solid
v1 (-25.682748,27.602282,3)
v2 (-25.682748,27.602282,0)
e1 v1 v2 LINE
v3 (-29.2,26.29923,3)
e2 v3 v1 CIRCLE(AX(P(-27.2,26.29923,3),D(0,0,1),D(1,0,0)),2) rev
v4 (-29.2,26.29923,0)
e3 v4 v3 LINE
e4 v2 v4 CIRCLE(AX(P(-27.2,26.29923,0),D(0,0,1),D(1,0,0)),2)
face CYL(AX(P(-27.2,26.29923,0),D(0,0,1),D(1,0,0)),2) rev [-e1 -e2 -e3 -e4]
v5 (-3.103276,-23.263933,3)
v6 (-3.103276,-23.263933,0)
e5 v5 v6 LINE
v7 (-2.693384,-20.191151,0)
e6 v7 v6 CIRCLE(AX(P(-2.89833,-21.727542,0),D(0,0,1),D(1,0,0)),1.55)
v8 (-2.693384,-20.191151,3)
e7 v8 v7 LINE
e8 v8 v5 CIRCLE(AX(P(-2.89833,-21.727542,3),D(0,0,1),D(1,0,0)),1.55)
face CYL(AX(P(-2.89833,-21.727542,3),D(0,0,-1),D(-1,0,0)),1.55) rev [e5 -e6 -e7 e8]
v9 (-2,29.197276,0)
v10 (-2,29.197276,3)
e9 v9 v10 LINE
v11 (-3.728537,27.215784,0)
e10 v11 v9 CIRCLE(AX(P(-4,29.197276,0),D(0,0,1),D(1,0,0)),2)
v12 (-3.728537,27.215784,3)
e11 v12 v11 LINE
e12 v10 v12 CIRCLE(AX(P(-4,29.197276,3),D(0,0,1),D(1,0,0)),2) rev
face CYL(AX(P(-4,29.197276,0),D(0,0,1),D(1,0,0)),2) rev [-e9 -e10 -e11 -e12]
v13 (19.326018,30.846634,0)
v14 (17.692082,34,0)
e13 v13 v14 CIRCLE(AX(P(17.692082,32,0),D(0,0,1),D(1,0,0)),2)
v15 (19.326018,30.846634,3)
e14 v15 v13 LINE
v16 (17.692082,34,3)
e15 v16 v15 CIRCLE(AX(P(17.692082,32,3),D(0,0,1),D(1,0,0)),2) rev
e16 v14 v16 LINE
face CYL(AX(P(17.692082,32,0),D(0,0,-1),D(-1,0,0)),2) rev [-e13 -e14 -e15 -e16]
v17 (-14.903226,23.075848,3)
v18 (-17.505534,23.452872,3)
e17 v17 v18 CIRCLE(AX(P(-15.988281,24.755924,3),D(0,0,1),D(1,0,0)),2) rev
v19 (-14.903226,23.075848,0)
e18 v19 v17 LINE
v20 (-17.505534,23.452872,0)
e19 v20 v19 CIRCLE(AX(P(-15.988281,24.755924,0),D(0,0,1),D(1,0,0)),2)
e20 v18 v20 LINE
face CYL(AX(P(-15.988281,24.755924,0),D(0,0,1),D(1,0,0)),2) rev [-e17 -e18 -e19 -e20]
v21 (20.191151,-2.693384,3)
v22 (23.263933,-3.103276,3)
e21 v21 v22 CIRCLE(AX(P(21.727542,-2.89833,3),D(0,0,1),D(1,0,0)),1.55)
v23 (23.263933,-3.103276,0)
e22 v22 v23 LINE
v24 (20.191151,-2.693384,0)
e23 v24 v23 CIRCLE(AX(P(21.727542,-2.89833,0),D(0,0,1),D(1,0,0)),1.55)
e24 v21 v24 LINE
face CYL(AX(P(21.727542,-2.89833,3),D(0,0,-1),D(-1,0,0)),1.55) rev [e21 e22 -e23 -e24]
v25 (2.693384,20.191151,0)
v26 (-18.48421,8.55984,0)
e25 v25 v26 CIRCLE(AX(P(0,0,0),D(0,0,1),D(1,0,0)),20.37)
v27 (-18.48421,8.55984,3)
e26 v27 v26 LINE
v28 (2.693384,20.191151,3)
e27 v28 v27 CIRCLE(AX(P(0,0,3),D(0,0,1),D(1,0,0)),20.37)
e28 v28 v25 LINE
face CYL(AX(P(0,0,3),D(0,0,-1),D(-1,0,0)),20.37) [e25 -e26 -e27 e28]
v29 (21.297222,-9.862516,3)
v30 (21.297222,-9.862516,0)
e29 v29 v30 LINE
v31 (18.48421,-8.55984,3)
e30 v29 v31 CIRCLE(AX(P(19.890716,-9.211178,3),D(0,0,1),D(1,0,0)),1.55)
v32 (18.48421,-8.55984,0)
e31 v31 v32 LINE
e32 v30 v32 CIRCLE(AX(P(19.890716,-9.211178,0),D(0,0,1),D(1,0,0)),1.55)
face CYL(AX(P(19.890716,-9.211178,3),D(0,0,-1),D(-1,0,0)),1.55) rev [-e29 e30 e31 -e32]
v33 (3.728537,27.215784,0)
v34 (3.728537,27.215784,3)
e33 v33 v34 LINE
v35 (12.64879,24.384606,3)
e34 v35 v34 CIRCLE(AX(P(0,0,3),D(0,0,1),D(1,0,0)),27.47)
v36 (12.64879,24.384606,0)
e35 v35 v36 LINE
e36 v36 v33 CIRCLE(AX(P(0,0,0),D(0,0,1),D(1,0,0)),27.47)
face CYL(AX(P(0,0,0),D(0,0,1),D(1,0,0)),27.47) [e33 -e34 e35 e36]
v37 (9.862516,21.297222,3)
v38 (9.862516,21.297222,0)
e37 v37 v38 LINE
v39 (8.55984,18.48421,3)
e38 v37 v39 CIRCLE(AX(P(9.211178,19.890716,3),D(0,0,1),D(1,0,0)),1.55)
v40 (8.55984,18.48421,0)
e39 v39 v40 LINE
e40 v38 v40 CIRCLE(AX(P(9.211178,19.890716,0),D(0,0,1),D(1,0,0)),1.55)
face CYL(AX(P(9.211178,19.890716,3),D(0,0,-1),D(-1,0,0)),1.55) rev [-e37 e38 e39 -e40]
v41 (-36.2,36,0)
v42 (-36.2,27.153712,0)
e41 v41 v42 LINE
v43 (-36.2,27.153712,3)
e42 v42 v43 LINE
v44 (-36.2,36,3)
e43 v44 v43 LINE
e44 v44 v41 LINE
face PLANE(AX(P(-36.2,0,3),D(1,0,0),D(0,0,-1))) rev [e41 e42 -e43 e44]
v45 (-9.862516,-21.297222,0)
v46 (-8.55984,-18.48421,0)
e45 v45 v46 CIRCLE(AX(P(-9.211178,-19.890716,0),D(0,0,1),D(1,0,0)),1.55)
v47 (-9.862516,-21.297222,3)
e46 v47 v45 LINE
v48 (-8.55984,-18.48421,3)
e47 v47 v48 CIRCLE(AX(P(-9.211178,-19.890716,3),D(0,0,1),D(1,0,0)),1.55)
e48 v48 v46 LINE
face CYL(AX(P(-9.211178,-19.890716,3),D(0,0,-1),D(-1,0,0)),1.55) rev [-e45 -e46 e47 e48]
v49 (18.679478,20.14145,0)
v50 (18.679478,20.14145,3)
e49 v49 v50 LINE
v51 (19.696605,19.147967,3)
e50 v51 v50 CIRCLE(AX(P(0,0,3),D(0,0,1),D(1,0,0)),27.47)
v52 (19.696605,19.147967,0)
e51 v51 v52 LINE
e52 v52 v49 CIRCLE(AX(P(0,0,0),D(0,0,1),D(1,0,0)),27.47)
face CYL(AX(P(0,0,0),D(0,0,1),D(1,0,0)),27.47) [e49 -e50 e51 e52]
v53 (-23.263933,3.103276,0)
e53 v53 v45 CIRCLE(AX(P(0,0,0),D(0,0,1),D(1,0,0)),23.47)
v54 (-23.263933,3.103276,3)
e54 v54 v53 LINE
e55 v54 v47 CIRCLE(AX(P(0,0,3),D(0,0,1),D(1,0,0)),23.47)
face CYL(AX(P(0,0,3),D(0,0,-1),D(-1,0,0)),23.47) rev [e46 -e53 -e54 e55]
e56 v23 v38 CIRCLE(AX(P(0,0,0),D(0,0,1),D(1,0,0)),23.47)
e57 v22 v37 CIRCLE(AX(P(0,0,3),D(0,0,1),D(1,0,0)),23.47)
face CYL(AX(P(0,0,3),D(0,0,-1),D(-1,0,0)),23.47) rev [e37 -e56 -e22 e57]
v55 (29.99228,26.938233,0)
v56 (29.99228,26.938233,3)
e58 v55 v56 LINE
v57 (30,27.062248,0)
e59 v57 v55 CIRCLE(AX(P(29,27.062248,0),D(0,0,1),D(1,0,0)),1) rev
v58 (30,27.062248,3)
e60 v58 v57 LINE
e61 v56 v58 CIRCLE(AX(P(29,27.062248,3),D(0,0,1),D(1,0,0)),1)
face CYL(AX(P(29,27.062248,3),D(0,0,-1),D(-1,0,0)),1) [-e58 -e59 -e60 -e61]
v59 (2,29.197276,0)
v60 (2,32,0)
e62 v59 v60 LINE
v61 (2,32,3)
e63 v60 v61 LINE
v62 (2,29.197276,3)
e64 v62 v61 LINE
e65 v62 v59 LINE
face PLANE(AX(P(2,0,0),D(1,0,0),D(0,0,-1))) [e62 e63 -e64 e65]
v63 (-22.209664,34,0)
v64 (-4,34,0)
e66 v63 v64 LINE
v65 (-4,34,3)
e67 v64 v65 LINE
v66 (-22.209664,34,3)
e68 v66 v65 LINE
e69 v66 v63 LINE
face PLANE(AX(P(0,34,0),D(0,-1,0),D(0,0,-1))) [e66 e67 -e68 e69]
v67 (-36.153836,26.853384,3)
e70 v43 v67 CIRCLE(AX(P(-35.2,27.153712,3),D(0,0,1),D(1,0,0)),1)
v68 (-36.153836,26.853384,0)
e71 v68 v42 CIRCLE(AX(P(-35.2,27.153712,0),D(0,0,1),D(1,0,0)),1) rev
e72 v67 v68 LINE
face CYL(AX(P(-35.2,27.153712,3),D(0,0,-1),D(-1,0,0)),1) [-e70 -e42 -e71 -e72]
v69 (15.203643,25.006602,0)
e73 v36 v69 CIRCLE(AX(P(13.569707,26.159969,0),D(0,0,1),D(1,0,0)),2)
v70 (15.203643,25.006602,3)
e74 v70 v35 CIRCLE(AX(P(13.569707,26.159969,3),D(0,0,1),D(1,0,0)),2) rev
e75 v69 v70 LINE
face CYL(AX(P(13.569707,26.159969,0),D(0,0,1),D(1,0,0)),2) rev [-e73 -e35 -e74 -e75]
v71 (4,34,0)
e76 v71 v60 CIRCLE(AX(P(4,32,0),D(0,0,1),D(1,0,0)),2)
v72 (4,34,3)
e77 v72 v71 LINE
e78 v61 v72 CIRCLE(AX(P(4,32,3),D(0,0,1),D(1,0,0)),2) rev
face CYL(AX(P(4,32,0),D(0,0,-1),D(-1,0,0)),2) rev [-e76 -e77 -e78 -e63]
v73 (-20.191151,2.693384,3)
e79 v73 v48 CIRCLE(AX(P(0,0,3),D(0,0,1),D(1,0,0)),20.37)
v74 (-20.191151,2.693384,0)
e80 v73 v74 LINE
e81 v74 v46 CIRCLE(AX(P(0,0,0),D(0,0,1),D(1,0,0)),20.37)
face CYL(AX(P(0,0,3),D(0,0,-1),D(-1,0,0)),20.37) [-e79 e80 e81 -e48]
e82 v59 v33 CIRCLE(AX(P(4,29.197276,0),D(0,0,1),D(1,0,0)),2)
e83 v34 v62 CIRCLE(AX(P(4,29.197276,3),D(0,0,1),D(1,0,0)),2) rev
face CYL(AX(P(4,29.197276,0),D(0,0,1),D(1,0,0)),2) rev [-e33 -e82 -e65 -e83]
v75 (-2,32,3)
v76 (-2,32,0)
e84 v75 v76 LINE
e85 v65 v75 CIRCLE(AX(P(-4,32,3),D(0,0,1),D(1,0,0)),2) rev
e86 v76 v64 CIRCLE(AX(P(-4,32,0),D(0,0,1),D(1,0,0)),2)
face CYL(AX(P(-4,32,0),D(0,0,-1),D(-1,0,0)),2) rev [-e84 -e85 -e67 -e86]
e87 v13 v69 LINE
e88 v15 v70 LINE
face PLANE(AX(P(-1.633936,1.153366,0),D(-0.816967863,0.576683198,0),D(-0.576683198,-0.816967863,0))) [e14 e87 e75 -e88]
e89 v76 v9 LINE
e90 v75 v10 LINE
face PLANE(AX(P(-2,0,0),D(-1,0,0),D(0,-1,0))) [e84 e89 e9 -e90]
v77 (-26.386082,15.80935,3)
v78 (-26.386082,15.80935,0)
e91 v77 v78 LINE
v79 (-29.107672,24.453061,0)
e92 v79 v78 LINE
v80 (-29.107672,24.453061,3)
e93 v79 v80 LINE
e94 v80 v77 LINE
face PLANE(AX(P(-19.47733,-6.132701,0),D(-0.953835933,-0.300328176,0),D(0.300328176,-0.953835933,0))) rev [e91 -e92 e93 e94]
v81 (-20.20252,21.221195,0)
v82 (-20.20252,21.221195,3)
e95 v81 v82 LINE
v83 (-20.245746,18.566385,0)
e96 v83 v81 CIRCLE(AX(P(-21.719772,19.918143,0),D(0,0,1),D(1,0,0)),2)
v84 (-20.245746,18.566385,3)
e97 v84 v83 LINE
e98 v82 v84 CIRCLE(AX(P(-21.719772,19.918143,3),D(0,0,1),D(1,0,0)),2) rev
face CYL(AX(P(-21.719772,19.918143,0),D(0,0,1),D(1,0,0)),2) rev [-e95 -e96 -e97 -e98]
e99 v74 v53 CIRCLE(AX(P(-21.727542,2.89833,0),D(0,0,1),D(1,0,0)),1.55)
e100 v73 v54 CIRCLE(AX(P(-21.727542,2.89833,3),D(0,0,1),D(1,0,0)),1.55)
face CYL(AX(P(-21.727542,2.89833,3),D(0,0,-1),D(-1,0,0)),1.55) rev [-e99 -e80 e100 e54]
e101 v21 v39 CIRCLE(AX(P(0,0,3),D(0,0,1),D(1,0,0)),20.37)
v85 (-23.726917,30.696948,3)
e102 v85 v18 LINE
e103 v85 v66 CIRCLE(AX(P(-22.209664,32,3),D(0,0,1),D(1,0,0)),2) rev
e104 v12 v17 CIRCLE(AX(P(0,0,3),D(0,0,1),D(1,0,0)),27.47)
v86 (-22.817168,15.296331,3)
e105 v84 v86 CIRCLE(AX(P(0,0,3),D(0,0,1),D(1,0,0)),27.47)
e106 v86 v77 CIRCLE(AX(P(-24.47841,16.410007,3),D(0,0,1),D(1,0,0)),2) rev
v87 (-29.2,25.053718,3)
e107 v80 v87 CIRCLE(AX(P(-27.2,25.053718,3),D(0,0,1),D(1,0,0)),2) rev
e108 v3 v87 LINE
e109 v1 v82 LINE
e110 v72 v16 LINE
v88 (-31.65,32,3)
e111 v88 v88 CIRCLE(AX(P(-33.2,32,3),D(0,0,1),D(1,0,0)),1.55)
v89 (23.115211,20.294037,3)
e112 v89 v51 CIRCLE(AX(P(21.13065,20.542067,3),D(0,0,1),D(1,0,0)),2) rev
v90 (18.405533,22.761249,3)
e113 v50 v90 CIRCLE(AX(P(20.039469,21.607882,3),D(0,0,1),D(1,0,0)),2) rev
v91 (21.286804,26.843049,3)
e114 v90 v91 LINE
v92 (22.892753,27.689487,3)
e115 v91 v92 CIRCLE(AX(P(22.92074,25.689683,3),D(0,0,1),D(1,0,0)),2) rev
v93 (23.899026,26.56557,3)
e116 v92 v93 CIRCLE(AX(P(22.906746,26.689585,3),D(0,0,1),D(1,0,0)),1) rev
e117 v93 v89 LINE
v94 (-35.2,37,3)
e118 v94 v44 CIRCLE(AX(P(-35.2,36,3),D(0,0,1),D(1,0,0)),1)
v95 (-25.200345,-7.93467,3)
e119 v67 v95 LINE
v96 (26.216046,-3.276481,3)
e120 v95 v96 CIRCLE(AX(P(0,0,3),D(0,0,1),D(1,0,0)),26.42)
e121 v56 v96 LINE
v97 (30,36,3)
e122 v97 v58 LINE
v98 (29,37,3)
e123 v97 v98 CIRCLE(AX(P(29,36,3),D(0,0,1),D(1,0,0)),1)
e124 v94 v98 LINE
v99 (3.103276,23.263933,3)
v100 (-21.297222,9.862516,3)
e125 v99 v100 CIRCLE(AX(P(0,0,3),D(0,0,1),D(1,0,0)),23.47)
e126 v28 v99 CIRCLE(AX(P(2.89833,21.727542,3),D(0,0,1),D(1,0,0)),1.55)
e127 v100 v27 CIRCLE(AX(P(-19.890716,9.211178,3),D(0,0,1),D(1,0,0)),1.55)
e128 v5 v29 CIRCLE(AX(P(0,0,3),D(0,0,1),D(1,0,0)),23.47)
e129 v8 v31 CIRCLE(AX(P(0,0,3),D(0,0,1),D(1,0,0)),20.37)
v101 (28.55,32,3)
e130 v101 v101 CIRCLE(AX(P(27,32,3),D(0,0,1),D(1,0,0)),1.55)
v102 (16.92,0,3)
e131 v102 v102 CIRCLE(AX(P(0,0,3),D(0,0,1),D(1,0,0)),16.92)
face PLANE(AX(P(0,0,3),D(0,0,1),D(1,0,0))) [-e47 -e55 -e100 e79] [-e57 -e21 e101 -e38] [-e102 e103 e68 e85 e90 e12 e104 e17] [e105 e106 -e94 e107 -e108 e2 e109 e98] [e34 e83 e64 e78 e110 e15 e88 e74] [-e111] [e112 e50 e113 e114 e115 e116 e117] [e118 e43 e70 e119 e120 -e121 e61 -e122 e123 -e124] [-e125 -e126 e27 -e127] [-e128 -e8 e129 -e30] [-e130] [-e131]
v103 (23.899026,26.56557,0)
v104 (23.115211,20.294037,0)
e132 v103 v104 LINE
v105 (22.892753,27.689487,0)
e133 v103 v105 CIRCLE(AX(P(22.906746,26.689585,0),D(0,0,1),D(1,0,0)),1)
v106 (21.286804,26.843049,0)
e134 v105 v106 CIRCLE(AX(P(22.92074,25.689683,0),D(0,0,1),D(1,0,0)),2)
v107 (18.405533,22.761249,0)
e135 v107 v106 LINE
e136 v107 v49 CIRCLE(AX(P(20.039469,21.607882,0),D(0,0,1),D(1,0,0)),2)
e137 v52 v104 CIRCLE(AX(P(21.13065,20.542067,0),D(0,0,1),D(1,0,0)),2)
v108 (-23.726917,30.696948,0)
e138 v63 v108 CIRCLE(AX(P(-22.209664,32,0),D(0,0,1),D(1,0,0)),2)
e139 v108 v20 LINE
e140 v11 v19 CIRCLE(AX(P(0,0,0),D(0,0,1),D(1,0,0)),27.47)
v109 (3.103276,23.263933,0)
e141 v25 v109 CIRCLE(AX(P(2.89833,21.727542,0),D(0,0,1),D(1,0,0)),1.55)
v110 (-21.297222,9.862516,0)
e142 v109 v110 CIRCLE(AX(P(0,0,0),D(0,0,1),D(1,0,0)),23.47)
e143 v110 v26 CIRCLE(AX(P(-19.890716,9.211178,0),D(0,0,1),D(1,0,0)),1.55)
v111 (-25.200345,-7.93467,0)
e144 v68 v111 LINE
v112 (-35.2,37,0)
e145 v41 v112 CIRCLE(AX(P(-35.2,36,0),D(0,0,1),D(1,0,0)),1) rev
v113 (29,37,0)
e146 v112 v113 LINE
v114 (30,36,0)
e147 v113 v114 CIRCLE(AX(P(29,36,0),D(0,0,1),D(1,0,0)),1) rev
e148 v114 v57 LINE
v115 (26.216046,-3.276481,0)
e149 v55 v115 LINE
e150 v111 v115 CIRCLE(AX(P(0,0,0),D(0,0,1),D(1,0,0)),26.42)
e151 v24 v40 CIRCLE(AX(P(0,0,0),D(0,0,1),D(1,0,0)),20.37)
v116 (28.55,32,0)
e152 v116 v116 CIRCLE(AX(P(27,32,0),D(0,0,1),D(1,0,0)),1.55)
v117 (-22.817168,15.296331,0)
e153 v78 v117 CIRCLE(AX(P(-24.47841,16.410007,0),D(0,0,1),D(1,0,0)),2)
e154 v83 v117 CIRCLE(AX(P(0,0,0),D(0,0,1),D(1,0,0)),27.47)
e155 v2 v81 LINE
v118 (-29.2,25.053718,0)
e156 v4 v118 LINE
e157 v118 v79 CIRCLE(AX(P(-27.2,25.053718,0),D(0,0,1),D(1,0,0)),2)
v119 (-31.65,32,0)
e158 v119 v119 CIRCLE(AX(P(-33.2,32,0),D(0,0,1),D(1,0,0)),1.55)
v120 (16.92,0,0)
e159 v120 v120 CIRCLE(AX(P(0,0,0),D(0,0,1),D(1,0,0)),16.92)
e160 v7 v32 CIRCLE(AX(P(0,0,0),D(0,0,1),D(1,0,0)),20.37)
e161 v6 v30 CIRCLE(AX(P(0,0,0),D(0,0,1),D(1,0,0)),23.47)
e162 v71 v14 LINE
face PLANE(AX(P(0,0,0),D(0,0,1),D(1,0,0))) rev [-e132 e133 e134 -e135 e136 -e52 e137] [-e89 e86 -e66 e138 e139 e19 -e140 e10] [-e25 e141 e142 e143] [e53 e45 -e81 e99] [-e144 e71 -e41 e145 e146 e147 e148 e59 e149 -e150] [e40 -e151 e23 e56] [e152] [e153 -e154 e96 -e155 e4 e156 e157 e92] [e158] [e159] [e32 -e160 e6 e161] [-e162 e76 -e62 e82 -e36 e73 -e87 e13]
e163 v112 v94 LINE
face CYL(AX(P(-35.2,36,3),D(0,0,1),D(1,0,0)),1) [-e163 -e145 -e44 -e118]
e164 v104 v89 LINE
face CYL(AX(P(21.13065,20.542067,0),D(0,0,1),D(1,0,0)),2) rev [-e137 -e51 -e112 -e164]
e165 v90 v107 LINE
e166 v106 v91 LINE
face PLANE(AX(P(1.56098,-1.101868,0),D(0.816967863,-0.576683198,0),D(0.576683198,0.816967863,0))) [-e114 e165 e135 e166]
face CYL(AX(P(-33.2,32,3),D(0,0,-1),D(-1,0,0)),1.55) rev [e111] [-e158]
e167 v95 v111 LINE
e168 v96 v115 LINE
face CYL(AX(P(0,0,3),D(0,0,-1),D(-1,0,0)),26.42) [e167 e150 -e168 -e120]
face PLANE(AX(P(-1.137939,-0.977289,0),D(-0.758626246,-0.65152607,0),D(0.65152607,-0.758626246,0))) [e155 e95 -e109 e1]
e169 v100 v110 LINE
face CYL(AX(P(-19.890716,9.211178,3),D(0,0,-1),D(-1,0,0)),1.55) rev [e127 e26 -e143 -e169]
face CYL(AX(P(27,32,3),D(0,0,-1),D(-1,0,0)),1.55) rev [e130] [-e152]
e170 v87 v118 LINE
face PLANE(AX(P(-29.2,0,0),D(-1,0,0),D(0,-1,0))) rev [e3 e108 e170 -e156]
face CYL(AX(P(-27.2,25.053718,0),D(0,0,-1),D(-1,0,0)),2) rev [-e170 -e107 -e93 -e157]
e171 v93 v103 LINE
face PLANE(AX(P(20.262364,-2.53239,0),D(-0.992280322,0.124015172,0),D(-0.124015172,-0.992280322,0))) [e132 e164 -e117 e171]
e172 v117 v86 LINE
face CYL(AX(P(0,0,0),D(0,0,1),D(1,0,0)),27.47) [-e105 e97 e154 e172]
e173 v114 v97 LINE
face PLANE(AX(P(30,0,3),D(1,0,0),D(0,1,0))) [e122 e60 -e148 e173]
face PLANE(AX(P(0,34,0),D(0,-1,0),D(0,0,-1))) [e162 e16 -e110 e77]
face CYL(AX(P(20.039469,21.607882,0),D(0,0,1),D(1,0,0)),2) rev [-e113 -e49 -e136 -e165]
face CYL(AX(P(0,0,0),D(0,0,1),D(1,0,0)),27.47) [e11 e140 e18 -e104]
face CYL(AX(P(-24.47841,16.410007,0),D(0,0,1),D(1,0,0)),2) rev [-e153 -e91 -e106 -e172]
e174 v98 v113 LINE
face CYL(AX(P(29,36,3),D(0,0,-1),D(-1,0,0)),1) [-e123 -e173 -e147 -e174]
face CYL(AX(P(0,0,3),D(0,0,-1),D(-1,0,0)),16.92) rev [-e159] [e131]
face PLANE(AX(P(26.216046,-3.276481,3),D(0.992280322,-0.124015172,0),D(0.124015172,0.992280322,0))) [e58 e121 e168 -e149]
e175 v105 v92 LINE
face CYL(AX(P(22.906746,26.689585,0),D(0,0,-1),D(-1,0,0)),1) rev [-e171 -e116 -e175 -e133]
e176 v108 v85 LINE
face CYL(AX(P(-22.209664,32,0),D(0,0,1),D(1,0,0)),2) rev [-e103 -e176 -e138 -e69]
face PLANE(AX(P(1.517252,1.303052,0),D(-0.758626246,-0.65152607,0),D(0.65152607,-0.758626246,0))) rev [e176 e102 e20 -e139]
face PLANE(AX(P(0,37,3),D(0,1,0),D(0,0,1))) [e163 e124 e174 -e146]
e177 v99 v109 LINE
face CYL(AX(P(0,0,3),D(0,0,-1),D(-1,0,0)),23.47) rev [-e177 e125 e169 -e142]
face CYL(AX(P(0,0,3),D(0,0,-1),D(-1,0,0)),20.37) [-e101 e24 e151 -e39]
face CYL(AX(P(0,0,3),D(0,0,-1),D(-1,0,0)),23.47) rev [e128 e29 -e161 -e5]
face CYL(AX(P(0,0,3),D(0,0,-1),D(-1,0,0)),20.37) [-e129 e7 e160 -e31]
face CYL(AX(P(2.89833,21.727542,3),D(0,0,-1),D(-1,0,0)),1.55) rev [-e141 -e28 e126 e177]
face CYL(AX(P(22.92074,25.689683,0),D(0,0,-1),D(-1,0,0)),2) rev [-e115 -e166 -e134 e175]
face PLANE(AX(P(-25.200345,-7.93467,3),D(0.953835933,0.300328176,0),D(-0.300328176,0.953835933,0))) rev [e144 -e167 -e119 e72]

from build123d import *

# Parameters (mm, degrees)
SKETCH_1_R          = 1.55
SKETCH_1_R_2        = 26.42
SKETCH_1_R_3        = 16.92
EXTRUDE_1_DEPTH     = 3
CUT_EXTRUDE_1_DEPTH = 3
FILLET_2_R          = 2
FILLET_3_R          = 1
FILLET_4_R          = 1


with BuildPart() as part:
    # 草图1 → 凸台-拉伸1 (new body)
    # profile 1 of 2: a face of its own
    with BuildSketch(Plane.XY):
        with BuildLine():
            Line((30, 37), (-36.2, 37))
            Line((-36.2, 37), (-36.2, 27))
            Line((-36.2, 27), (-25.200345341, -7.93467042))
            ThreePointArc((-25.200345341, -7.93467042), (-4.013930498, 26.113306224), (26.42, 0))
            ThreePointArc((26.42, 0), (26.368962228, -1.641411281), (26.216046102, -3.276480854))
            Line((26.216046102, -3.276480854), (30, 27))
            Line((30, 27), (30, 37))
        make_face()
        with Locations((-33.2, 32)):
            Circle(SKETCH_1_R, mode=Mode.SUBTRACT)
        with Locations((27, 32)):
            Circle(SKETCH_1_R, mode=Mode.SUBTRACT)
    # profile 2 of 2: a face of its own
    with BuildSketch(Plane.XY):
        Circle(SKETCH_1_R_2)
        Circle(SKETCH_1_R_3, mode=Mode.SUBTRACT)
        with BuildLine():
            ThreePointArc((-23.263933046, 3.103275567), (-20.571496751, -11.298425617), (-9.862515799, -21.297222404))
            ThreePointArc((-9.862515799, -21.297222404), (-7.804671989, -20.542054307), (-8.559840086, -18.484210497))
            ThreePointArc((-8.559840086, -18.484210497), (-17.854341236, -9.806089894), (-20.191151092, 2.693384035))
            ThreePointArc((-20.191151092, 2.693384035), (-21.522596303, 4.434720778), (-23.263933046, 3.103275567))
        make_face(mode=Mode.SUBTRACT)
        with BuildLine():
            ThreePointArc((-3.103275567, -23.263933046), (11.298425617, -20.571496751), (21.297222404, -9.862515799))
            ThreePointArc((21.297222404, -9.862515799), (20.542054307, -7.804671989), (18.484210497, -8.559840086))
            ThreePointArc((18.484210497, -8.559840086), (9.806089894, -17.854341236), (-2.693384035, -20.191151092))
            ThreePointArc((-2.693384035, -20.191151092), (-4.434720778, -21.522596303), (-3.103275567, -23.263933046))
        make_face(mode=Mode.SUBTRACT)
        with BuildLine():
            ThreePointArc((23.263933046, -3.103275567), (20.571496751, 11.298425617), (9.862515799, 21.297222404))
            ThreePointArc((9.862515799, 21.297222404), (7.804671989, 20.542054307), (8.559840086, 18.484210497))
            ThreePointArc((8.559840086, 18.484210497), (17.854341236, 9.806089894), (20.191151092, -2.693384035))
            ThreePointArc((20.191151092, -2.693384035), (21.522596303, -4.434720778), (23.263933046, -3.103275567))
        make_face(mode=Mode.SUBTRACT)
        with BuildLine():
            ThreePointArc((3.103275567, 23.263933046), (-11.298425617, 20.571496751), (-21.297222404, 9.862515799))
            ThreePointArc((-21.297222404, 9.862515799), (-20.542054307, 7.804671989), (-18.484210497, 8.559840086))
            ThreePointArc((-18.484210497, 8.559840086), (-9.806089894, 17.854341236), (2.693384035, 20.191151092))
            ThreePointArc((2.693384035, 20.191151092), (4.434720778, 21.522596303), (3.103275567, 23.263933046))
        make_face(mode=Mode.SUBTRACT)
    extrude(amount=EXTRUDE_1_DEPTH)

    # 草图2 → 切除-拉伸1 (cut)
    with BuildSketch(Plane.XY.offset(3)):
        with BuildLine():
            Line((-19.008658137, 19.831082064), (-29.2, 31.697713001))
            Line((-29.2, 31.697713001), (-29.2, 24.746293615))
            Line((-29.2, 24.746293615), (-24.995728208, 11.393615376))
            ThreePointArc((-24.995728208, 11.393615376), (-22.40299568, 15.896750755), (-19.008658137, 19.831082064))
        make_face()
        with BuildLine():
            Line((-2, 34), (-26.563655671, 34))
            Line((-26.563655671, 34), (-16.332670153, 22.087208643))
            ThreePointArc((-16.332670153, 22.087208643), (-9.543082634, 25.759085268), (-2, 27.397096561))
            Line((-2, 27.397096561), (-2, 34))
        make_face()
        with BuildLine():
            Line((2, 34), (2, 27.397096561))
            ThreePointArc((2, 27.397096561), (8.310120791, 26.18287212), (14.165509523, 23.535913833))
            Line((14.165509523, 23.535913833), (21.551923289, 34))
            Line((21.551923289, 34), (2, 34))
        make_face()
        with BuildLine():
            ThreePointArc((17.364100225, 21.285885544), (20.1471001, 18.673383667), (22.541088548, 15.7003257))
            Line((22.541088548, 15.7003257), (24, 27.373487117))
            Line((24, 27.373487117), (24, 30.686743559))
            Line((24, 30.686743559), (17.364100225, 21.285885544))
        make_face()
    extrude(amount=-CUT_EXTRUDE_1_DEPTH, mode=Mode.SUBTRACT)

    # 圆角2
    # the kernel refuses this fillet: 2 mm, written as the material it adds along each edge
    with BuildSketch(Plane(origin=(-24.995728208, 11.393615376, 3), x_dir=(-0.30032817640005316, 0.9538359326740729, 0), z_dir=(0, 0, -1))) as fillet_2_piece_1:
        with BuildLine():
            CenterArc((4.629449301, 2), FILLET_2_R, 141.314699256, 128.685300744)
            Line((3.068267725, 3.250084832), (3.037044093, 3.275086529))
            ThreePointArc((3.037044093, 3.275086529), (1.571259467, 1.589993702), (-0.026755823, 0.029734256))
            Line((-0.026755823, 0.029734256), (0, -0.04))
            Line((0, -0.04), (4.629449301, -0.04))
            Line((4.629449301, -0.04), (4.629449301, 0))
        make_face()
    extrude(amount=3)
    with BuildSketch(Plane(origin=(-29.2, 31.697713001, 3), x_dir=(0.6515260697252437, -0.7586262455704896, 0), z_dir=(0, 0, -1))) as fillet_2_piece_2:
        with BuildLine():
            CenterArc((FILLET_2_R * 2.69924156114, FILLET_2_R), FILLET_2_R, 130.656760048, 139.343239952)
            Line((FILLET_2_R * 2.04771549142, FILLET_2_R * 1.75862624557), (FILLET_2_R * 2.03468497002, FILLET_2_R * 1.77379877048))
            Line((FILLET_2_R * 2.03468497002, FILLET_2_R * 1.77379877048), (-FILLET_2_R * 0.0130305213945, FILLET_2_R * 0.0151725249114))
            Line((-FILLET_2_R * 0.0130305213945, FILLET_2_R * 0.0151725249114), (0, -FILLET_2_R * 0.02))
            Line((0, -FILLET_2_R * 0.02), (FILLET_2_R * 2.69924156114, -FILLET_2_R * 0.02))
            Line((FILLET_2_R * 2.69924156114, -FILLET_2_R * 0.02), (FILLET_2_R * 2.69924156114, 0))
        make_face()
    extrude(amount=3)
    with BuildSketch(Plane(origin=(-19.008658137, 19.831082064, 3), x_dir=(-0.6515260697252421, 0.758626245570491, 0), z_dir=(0, 0, -1))) as fillet_2_piece_3:
        with BuildLine():
            CenterArc((1.832407752, -2), FILLET_2_R, 90, 83.179176321)
            Line((-0.153437067, -1.762470309), (-0.193153964, -1.757719715))
            ThreePointArc((-0.193153964, -1.757719715), (-0.102375692, -0.879001495), (-0.039940321, 0.002184201))
            Line((-0.039940321, 0.002184201), (0, 0.04))
            Line((0, 0.04), (1.832407752, 0.04))
            Line((1.832407752, 0.04), (1.832407752, 0))
        make_face()
    extrude(amount=3)
    with BuildSketch(Plane(origin=(-29.2, 24.746293615, 3), x_dir=(0, 1, 0), z_dir=(0, 0, -1))) as fillet_2_piece_4:
        with BuildLine():
            CenterArc((FILLET_2_R * 0.153712075501, FILLET_2_R), FILLET_2_R, 252.522684781, 17.477315219)
            Line((-FILLET_2_R * 0.146616100899, FILLET_2_R * 0.0461640673259), (-FILLET_2_R * 0.152622664427, FILLET_2_R * 0.0270873486724))
            Line((-FILLET_2_R * 0.152622664427, FILLET_2_R * 0.0270873486724), (-FILLET_2_R * 0.00307424151002, -FILLET_2_R * 0.02))
            Line((-FILLET_2_R * 0.00307424151002, -FILLET_2_R * 0.02), (FILLET_2_R * 0.153712075501, -FILLET_2_R * 0.02))
            Line((FILLET_2_R * 0.153712075501, -FILLET_2_R * 0.02), (FILLET_2_R * 0.153712075501, 0))
        make_face()
    extrude(amount=3)
    with BuildSketch(Plane(origin=(24, 30.686743559, 3), x_dir=(0, -1, 0), z_dir=(0, 0, -1))) as fillet_2_piece_5:
        with BuildLine():
            CenterArc((4.997060807, 1.079260329), FILLET_2_R, 125.217592968, 87.440873122)
            Line((3.843694412, 2.713196056), (3.820627084, 2.74587477))
            Line((3.820627084, 2.74587477), (-0.023067328, 0.032678715))
            Line((-0.023067328, 0.032678715), (0, -0.04))
            ThreePointArc((0, -0.04), (1.656628221, -0.04), (3.279580354, -0.021585207))
            Line((3.279580354, -0.021585207), (3.313256441, 0))
        make_face()
    extrude(amount=3)
    with BuildSketch(Plane(origin=(22.541088548, 15.7003257, 3), x_dir=(-0.6364068134121097, 0.7713535945613038, 0), z_dir=(0, 0, -1))) as fillet_2_piece_6:
        with BuildLine():
            CenterArc((4.632307724, 1.993370508), FILLET_2_R, 136.64829025, 128.685300744)
            Line((3.17800071, 3.366320293), (3.14891457, 3.393779288))
            Line((3.14891457, 3.393779288), (-0.02908614, 0.027458996))
            Line((-0.02908614, 0.027458996), (0.003254168, -0.03986741))
            ThreePointArc((0.003254168, -0.03986741), (2.234799669, 0.051056075), (4.466345171, -0.03986741))
            Line((4.466345171, -0.03986741), (4.469599338, 0))
        make_face()
    extrude(amount=3)
    with BuildSketch(Plane(origin=(17.364100225, 21.285885544, 3), x_dir=(0.7544268815808631, -0.6563840951365095, 0), z_dir=(0, 0, -1))) as fillet_2_piece_7:
        with BuildLine():
            CenterArc((1.80701637, -1.998992608), FILLET_2_R, 91.818612545, 82.374297542)
            Line((-0.182720022, -1.796633797), (-0.22251475, -1.792586621))
            Line((-0.22251475, -1.792586621), (-0.039794728, 0.004047176))
            Line((-0.039794728, 0.004047176), (0.001269418, 0.039979852))
            ThreePointArc((0.001269418, 0.039979852), (0.871772738, 0.026163466), (1.742276058, 0.039979852))
            Line((1.742276058, 0.039979852), (1.743545476, 0))
        make_face()
    extrude(amount=3)
    with BuildSketch(Plane(origin=(2, 27.397096561, 3), x_dir=(0.9945436589558404, -0.10432118879081512, 0), z_dir=(0, 0, -1)), Plane(origin=(-16.332670153, 22.087208643, 3), x_dir=(0.8224548961715518, 0.5688303295038354, 0), z_dir=(0, 0, -1))) as fillet_2_piece_8:
        with BuildLine():
            CenterArc((1.801290505, -1.998998983), FILLET_2_R, 91.812848009, 82.19909323)
            Line((-0.187796813, -1.790356606), (-0.227578559, -1.786183758))
            Line((-0.227578559, -1.786183758), (-0.039781746, 0.004172848))
            Line((-0.039781746, 0.004172848), (0.001265396, 0.03997998))
            ThreePointArc((0.001265396, 0.03997998), (0.869010365, 0.026251037), (1.736755334, 0.03997998))
            Line((1.736755334, 0.03997998), (1.73802073, 0))
        make_face()
    extrude(amount=3)
    with BuildSketch(Plane(origin=(21.551923289, 34, 3), x_dir=(-0.576683197598655, -0.8169678632647618, 0), z_dir=(0, 0, -1))) as fillet_2_piece_9:
        with BuildLine():
            CenterArc((FILLET_2_R * 1.92992070863, FILLET_2_R), FILLET_2_R, 144.782407032, 125.217592968)
            Line((FILLET_2_R * 1.11295284536, FILLET_2_R * 1.5766831976), (FILLET_2_R * 1.0966134881, FILLET_2_R * 1.58821686155))
            Line((FILLET_2_R * 1.0966134881, FILLET_2_R * 1.58821686155), (-FILLET_2_R * 0.0163393572653, FILLET_2_R * 0.011533663952))
            Line((-FILLET_2_R * 0.0163393572653, FILLET_2_R * 0.011533663952), (0, -FILLET_2_R * 0.02))
            Line((0, -FILLET_2_R * 0.02), (FILLET_2_R * 1.92992070863, -FILLET_2_R * 0.02))
            Line((FILLET_2_R * 1.92992070863, -FILLET_2_R * 0.02), (FILLET_2_R * 1.92992070863, 0))
        make_face()
    extrude(amount=3)
    with BuildSketch(Plane(origin=(14.165509523, 23.535913833, 3), x_dir=(-0.8726704847098519, 0.4883095586984472, 0), z_dir=(0, 0, -1)), Plane(origin=(-2, 27.397096561, 3), x_dir=(-0.9945436589558406, -0.10432118879081306, 0), z_dir=(0, 0, -1))) as fillet_2_piece_10:
        with BuildLine():
            CenterArc((1.801290505, 1.998998983), FILLET_2_R, 185.988058762, 82.19909323)
            Line((-0.187796813, 1.790356606), (-0.227578559, 1.786183758))
            Line((-0.227578559, 1.786183758), (-0.039781746, -0.004172848))
            Line((-0.039781746, -0.004172848), (0.001265396, -0.03997998))
            ThreePointArc((0.001265396, -0.03997998), (0.869010365, -0.026251037), (1.736755334, -0.03997998))
            Line((1.736755334, -0.03997998), (1.73802073, 0))
        make_face()
    extrude(amount=3)
    with BuildSketch(Plane(origin=(2, 34, 3), x_dir=(1, 0, 0), z_dir=(0, 0, -1)), Plane(origin=(-2, 34, 3), x_dir=(0, -1, 0), z_dir=(0, 0, -1))) as fillet_2_piece_11:
        with BuildLine():
            CenterArc((FILLET_2_R, FILLET_2_R), FILLET_2_R, 180, 90)
            Line((0, FILLET_2_R), (-FILLET_2_R * 0.02, FILLET_2_R))
            Line((-FILLET_2_R * 0.02, FILLET_2_R), (-FILLET_2_R * 0.02, -FILLET_2_R * 0.02))
            Line((-FILLET_2_R * 0.02, -FILLET_2_R * 0.02), (FILLET_2_R, -FILLET_2_R * 0.02))
            Line((FILLET_2_R, -FILLET_2_R * 0.02), (FILLET_2_R, 0))
        make_face()
    extrude(amount=3)
    with BuildSketch(Plane(origin=(-26.563655671, 34, 3), x_dir=(1, 0, 0), z_dir=(0, 0, -1))) as fillet_2_piece_12:
        with BuildLine():
            CenterArc((FILLET_2_R * 2.17699569369, FILLET_2_R), FILLET_2_R, 139.343239952, 130.656760048)
            Line((FILLET_2_R * 1.41836944812, FILLET_2_R * 1.65152606973), (FILLET_2_R * 1.40319692321, FILLET_2_R * 1.66455659112))
            Line((FILLET_2_R * 1.40319692321, FILLET_2_R * 1.66455659112), (-FILLET_2_R * 0.0151725249114, FILLET_2_R * 0.0130305213945))
            Line((-FILLET_2_R * 0.0151725249114, FILLET_2_R * 0.0130305213945), (0, -FILLET_2_R * 0.02))
            Line((0, -FILLET_2_R * 0.02), (FILLET_2_R * 2.17699569369, -FILLET_2_R * 0.02))
            Line((FILLET_2_R * 2.17699569369, -FILLET_2_R * 0.02), (FILLET_2_R * 2.17699569369, 0))
        make_face()
    extrude(amount=3)

    # 圆角3
    fillet_3_edges = [part.edges().sort_by_distance(p)[0] for p in [
        (24, 27.373487117, 1.5),
    ]]
    fillet(fillet_3_edges, radius=FILLET_3_R)

    # 圆角4
    fillet_4_edges = [part.edges().sort_by_distance(p)[0] for p in [
        (-36.2, 27, 1.5),
        (-36.2, 37, 1.5),
        (30, 37, 1.5),
        (30, 27, 1.5),
    ]]
    fillet(fillet_4_edges, radius=FILLET_4_R)


solid = part.part
